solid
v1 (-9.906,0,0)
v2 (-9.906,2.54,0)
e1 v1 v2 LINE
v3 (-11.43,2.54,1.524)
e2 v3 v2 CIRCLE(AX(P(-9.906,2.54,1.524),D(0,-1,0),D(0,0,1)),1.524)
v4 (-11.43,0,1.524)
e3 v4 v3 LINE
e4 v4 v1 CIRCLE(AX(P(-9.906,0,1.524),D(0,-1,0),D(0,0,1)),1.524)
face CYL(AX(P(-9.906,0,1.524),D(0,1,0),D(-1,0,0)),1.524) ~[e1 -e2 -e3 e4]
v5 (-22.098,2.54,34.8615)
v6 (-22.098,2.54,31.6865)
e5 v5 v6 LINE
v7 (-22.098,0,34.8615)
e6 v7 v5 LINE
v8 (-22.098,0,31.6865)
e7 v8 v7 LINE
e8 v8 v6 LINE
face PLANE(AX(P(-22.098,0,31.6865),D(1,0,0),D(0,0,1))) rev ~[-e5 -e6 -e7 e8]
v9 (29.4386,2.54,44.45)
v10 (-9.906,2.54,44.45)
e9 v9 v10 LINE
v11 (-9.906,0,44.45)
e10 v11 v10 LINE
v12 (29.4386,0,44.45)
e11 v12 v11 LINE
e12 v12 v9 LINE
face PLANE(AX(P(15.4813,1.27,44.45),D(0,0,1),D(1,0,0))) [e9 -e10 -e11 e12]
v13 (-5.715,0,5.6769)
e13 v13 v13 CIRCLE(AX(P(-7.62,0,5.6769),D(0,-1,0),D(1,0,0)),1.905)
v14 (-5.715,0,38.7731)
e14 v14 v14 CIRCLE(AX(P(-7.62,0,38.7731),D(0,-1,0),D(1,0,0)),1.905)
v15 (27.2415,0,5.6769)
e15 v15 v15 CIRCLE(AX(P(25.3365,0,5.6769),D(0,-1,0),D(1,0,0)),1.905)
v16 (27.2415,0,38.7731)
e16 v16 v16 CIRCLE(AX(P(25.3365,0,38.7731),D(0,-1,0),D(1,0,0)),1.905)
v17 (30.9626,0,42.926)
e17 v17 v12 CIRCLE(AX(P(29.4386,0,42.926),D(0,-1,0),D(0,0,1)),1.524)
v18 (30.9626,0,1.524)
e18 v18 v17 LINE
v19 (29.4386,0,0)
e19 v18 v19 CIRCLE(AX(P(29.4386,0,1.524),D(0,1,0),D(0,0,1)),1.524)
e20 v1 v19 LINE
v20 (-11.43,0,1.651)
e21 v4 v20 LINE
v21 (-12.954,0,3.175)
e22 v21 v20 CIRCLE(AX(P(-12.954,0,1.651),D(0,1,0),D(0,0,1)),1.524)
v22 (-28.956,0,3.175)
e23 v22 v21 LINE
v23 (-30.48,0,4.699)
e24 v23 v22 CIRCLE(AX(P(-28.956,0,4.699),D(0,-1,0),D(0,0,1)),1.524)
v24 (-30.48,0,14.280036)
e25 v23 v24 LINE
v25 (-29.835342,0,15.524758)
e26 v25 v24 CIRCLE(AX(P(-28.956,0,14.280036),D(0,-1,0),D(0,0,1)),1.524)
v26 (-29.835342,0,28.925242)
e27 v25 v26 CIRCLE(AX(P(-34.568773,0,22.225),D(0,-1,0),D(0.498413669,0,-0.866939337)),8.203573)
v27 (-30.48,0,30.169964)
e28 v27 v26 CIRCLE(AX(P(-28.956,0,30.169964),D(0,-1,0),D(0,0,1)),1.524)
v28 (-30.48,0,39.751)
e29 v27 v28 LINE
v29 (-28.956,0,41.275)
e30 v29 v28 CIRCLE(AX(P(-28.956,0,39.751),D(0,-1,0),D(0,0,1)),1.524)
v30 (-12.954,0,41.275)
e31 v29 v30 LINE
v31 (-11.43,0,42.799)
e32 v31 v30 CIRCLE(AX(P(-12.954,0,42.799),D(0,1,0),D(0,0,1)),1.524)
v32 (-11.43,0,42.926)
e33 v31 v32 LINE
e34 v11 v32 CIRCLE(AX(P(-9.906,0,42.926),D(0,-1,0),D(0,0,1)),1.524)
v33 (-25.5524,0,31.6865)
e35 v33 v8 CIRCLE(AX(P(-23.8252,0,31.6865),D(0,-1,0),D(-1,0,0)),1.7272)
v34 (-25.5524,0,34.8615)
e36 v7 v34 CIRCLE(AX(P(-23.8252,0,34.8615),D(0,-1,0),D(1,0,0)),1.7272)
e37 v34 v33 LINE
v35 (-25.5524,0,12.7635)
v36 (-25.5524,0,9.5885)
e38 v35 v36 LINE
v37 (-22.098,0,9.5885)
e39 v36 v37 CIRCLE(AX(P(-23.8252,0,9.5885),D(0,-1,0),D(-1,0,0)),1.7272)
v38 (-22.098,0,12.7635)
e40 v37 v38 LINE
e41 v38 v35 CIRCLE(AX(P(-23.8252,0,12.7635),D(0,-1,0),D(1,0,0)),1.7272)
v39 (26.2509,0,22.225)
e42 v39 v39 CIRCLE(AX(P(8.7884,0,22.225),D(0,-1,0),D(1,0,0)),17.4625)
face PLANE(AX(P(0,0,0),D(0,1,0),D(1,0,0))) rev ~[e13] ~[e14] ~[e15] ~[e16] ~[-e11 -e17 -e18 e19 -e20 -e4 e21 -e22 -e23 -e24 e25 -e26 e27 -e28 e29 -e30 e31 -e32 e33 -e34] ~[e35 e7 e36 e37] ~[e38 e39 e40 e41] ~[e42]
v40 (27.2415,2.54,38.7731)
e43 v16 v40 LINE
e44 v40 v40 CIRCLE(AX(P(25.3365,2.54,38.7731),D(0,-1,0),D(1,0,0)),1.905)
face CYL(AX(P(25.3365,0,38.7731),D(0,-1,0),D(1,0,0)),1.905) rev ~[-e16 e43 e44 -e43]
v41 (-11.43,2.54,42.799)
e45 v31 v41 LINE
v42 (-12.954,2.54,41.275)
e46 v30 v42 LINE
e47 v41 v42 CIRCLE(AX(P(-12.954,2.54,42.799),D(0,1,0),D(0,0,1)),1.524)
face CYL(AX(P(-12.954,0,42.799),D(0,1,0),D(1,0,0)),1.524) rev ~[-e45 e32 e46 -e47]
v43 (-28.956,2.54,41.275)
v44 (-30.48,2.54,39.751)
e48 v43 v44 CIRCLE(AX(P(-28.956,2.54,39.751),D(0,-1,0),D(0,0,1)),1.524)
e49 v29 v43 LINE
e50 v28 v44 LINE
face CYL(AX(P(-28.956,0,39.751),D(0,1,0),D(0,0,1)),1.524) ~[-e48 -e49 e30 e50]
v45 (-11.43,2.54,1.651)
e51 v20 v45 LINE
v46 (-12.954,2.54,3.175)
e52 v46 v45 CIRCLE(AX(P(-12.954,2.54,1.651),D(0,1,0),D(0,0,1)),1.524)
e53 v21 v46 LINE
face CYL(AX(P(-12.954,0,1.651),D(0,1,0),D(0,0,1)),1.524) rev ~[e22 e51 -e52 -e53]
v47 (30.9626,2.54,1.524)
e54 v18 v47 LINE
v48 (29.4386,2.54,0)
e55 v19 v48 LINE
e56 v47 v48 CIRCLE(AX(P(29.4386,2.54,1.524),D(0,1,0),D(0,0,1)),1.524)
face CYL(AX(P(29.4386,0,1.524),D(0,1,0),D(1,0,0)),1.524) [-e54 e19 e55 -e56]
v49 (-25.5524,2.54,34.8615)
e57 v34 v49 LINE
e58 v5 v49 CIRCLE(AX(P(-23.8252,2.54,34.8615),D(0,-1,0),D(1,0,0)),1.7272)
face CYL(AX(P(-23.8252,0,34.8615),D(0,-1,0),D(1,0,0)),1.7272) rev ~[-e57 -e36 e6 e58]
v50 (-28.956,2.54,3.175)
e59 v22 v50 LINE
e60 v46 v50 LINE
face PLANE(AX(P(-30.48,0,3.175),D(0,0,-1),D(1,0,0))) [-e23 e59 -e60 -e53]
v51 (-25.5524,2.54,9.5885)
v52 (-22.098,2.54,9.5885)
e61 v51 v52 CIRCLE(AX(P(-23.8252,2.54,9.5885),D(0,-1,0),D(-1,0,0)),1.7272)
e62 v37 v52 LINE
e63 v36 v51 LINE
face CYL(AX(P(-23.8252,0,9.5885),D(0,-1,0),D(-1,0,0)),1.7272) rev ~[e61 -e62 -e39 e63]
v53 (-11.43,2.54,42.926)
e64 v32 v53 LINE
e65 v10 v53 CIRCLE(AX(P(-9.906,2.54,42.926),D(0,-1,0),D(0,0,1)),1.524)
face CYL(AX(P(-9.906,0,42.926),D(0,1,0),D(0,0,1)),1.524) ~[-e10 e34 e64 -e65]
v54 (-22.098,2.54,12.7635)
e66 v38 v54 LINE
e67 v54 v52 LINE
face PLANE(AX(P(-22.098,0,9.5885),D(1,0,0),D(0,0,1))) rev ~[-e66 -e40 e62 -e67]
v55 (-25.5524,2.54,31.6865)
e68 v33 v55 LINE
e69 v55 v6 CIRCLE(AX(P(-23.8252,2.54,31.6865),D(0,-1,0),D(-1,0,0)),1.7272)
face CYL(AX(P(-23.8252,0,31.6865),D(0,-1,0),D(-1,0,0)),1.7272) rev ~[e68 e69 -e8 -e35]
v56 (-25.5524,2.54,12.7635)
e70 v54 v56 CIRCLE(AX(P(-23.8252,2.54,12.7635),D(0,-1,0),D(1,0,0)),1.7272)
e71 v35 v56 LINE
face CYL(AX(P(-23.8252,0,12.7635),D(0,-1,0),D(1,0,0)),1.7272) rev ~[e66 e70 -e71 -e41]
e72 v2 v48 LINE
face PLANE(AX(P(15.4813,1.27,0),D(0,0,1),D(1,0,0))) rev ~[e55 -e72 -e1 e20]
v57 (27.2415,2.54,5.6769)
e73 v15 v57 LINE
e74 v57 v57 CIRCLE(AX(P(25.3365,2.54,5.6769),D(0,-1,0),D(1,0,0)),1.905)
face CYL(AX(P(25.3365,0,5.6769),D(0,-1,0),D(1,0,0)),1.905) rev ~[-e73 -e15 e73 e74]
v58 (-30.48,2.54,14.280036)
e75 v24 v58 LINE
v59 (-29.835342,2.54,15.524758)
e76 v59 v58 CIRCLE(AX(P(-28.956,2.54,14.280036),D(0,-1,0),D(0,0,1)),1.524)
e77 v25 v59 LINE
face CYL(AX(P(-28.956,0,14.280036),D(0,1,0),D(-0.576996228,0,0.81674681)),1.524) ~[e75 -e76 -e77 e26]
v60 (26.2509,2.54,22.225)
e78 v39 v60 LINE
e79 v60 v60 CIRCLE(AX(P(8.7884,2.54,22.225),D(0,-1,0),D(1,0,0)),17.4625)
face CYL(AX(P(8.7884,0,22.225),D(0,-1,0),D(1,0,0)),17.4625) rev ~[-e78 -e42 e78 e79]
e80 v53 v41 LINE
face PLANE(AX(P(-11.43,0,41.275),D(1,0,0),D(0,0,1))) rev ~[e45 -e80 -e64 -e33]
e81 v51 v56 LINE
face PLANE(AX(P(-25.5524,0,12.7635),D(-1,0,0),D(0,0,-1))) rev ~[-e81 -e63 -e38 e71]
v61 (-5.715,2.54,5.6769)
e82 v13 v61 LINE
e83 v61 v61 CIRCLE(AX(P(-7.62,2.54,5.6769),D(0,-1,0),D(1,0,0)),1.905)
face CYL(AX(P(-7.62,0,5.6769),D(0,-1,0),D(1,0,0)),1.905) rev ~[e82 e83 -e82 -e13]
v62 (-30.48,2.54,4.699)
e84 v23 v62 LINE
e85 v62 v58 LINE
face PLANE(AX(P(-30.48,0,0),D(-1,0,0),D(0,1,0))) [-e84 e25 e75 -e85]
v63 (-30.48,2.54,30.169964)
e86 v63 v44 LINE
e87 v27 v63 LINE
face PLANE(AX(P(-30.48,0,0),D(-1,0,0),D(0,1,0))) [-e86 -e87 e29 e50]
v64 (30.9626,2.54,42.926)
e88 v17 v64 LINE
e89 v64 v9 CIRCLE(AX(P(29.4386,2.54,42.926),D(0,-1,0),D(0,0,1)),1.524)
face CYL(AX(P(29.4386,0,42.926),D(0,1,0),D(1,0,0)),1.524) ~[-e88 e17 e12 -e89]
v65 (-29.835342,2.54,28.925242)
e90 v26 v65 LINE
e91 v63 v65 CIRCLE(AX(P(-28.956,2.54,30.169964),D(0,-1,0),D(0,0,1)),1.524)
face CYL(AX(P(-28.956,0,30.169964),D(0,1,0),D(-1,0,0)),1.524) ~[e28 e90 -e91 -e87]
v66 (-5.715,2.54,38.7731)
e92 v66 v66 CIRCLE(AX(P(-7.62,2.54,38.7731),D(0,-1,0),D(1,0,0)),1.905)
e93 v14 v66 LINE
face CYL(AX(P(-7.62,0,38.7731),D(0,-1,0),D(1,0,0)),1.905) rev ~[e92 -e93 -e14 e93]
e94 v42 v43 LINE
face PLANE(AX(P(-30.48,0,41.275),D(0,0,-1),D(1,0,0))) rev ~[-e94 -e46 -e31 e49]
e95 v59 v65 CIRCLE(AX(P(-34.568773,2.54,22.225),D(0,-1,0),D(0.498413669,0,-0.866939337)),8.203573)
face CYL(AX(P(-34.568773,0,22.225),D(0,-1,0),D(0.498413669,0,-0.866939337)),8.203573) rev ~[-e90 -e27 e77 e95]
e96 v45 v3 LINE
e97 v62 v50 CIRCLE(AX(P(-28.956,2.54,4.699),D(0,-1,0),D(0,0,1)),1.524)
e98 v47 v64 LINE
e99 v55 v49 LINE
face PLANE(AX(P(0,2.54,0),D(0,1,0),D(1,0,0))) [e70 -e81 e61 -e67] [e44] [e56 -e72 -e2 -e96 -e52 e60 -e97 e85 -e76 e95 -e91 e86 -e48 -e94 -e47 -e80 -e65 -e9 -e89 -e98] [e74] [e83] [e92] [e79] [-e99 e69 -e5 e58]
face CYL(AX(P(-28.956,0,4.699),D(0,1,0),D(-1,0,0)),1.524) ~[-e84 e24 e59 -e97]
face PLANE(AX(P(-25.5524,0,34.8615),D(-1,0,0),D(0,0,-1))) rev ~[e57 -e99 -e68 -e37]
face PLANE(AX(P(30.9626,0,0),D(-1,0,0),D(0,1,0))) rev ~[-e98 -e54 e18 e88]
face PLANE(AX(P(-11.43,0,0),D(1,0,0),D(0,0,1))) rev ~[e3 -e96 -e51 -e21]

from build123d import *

# Parameters (mm, degrees)
F0_W     = 30.48
F0_H     = 2.54
F1_DEPTH = 44.45
F0_W_2   = 30.9626
F3_DEPTH = 44.45
F4_R     = 1.905
F4_R_2   = 17.4625
F5_DEPTH = 25.4
F2_W     = 19.05
F2_H     = 3.175
F6_DEPTH = 25.4
F7_R     = 1.524


# Not quite as in the source:
# - a feature names something its author has since deleted; it is built from what else it names


with BuildPart() as f1:
    # F0 (on Top) → F1 (new body)
    with BuildSketch(Plane.XY):
        with Locations((-15.24, 1.27)):
            Rectangle(F0_W, F0_H)
    extrude(amount=F1_DEPTH)

    # F0 (on Top) → F3 (join)
    with BuildSketch(Plane.XY):
        with Locations((15.4813, 1.27)):
            Rectangle(F0_W_2, F0_H)
    extrude(amount=F3_DEPTH)

    # F4 (on face) + F2 (on face) → F5 (cut)
    with BuildSketch(Plane.XZ):
        with Locations((-7.62, 38.7731)):
            Circle(F4_R)
        with Locations((-7.62, 5.6769)):
            Circle(F4_R)
        with Locations((25.3365, 38.7731)):
            Circle(F4_R)
        with Locations((25.3365, 5.6769)):
            Circle(F4_R)
        with Locations((8.7884, 22.225)):
            Circle(F4_R_2)
    with BuildSketch(Plane.XZ):
        with BuildLine():
            Line((-22.098, 9.5885), (-22.098, 12.7635))
            ThreePointArc((-22.098, 12.7635), (-23.8252, 14.4907), (-25.5524, 12.7635))
            Line((-25.5524, 12.7635), (-25.5524, 9.5885))
            ThreePointArc((-25.5524, 9.5885), (-23.8252, 7.8613), (-22.098, 9.5885))
        make_face()
        with BuildLine():
            Line((-22.098, 31.6865), (-22.098, 34.8615))
            ThreePointArc((-22.098, 34.8615), (-23.8252, 36.5887), (-25.5524, 34.8615))
            Line((-25.5524, 34.8615), (-25.5524, 31.6865))
            ThreePointArc((-25.5524, 31.6865), (-23.8252, 29.9593), (-22.098, 31.6865))
        make_face()
        with BuildLine():
            Line((-30.48, 29.337), (-30.48, 15.113))
            ThreePointArc((-30.48, 15.113), (-26.3652, 22.225), (-30.48, 29.337))
        make_face()
    extrude(amount=-F5_DEPTH, mode=Mode.SUBTRACT)

    # F2 (on face) → F6 (cut)
    with BuildSketch(Plane.XZ):
        with Locations((-20.955, 42.8625)):
            Rectangle(F2_W, F2_H)
        with Locations((-20.955, 1.5875)):
            Rectangle(F2_W, F2_H)
    extrude(amount=-F6_DEPTH, mode=Mode.SUBTRACT)

    # F7
    f7_edges = [f1.edges().sort_by_distance(p)[0] for p in [
        (-11.43, 1.27, 41.275),
        (-11.43, 1.27, 44.45),
        (-11.43, 1.27, 0),
        (-11.43, 1.27, 3.175),
        (-30.48, 1.27, 3.175),
        (-30.48, 1.27, 29.337),
        (-30.48, 1.27, 15.113),
        (-30.48, 1.27, 41.275),
        (30.9626, 1.27, 0),
        (30.9626, 1.27, 44.45),
    ]]
    fillet(f7_edges, radius=F7_R)


solid = f1.part
